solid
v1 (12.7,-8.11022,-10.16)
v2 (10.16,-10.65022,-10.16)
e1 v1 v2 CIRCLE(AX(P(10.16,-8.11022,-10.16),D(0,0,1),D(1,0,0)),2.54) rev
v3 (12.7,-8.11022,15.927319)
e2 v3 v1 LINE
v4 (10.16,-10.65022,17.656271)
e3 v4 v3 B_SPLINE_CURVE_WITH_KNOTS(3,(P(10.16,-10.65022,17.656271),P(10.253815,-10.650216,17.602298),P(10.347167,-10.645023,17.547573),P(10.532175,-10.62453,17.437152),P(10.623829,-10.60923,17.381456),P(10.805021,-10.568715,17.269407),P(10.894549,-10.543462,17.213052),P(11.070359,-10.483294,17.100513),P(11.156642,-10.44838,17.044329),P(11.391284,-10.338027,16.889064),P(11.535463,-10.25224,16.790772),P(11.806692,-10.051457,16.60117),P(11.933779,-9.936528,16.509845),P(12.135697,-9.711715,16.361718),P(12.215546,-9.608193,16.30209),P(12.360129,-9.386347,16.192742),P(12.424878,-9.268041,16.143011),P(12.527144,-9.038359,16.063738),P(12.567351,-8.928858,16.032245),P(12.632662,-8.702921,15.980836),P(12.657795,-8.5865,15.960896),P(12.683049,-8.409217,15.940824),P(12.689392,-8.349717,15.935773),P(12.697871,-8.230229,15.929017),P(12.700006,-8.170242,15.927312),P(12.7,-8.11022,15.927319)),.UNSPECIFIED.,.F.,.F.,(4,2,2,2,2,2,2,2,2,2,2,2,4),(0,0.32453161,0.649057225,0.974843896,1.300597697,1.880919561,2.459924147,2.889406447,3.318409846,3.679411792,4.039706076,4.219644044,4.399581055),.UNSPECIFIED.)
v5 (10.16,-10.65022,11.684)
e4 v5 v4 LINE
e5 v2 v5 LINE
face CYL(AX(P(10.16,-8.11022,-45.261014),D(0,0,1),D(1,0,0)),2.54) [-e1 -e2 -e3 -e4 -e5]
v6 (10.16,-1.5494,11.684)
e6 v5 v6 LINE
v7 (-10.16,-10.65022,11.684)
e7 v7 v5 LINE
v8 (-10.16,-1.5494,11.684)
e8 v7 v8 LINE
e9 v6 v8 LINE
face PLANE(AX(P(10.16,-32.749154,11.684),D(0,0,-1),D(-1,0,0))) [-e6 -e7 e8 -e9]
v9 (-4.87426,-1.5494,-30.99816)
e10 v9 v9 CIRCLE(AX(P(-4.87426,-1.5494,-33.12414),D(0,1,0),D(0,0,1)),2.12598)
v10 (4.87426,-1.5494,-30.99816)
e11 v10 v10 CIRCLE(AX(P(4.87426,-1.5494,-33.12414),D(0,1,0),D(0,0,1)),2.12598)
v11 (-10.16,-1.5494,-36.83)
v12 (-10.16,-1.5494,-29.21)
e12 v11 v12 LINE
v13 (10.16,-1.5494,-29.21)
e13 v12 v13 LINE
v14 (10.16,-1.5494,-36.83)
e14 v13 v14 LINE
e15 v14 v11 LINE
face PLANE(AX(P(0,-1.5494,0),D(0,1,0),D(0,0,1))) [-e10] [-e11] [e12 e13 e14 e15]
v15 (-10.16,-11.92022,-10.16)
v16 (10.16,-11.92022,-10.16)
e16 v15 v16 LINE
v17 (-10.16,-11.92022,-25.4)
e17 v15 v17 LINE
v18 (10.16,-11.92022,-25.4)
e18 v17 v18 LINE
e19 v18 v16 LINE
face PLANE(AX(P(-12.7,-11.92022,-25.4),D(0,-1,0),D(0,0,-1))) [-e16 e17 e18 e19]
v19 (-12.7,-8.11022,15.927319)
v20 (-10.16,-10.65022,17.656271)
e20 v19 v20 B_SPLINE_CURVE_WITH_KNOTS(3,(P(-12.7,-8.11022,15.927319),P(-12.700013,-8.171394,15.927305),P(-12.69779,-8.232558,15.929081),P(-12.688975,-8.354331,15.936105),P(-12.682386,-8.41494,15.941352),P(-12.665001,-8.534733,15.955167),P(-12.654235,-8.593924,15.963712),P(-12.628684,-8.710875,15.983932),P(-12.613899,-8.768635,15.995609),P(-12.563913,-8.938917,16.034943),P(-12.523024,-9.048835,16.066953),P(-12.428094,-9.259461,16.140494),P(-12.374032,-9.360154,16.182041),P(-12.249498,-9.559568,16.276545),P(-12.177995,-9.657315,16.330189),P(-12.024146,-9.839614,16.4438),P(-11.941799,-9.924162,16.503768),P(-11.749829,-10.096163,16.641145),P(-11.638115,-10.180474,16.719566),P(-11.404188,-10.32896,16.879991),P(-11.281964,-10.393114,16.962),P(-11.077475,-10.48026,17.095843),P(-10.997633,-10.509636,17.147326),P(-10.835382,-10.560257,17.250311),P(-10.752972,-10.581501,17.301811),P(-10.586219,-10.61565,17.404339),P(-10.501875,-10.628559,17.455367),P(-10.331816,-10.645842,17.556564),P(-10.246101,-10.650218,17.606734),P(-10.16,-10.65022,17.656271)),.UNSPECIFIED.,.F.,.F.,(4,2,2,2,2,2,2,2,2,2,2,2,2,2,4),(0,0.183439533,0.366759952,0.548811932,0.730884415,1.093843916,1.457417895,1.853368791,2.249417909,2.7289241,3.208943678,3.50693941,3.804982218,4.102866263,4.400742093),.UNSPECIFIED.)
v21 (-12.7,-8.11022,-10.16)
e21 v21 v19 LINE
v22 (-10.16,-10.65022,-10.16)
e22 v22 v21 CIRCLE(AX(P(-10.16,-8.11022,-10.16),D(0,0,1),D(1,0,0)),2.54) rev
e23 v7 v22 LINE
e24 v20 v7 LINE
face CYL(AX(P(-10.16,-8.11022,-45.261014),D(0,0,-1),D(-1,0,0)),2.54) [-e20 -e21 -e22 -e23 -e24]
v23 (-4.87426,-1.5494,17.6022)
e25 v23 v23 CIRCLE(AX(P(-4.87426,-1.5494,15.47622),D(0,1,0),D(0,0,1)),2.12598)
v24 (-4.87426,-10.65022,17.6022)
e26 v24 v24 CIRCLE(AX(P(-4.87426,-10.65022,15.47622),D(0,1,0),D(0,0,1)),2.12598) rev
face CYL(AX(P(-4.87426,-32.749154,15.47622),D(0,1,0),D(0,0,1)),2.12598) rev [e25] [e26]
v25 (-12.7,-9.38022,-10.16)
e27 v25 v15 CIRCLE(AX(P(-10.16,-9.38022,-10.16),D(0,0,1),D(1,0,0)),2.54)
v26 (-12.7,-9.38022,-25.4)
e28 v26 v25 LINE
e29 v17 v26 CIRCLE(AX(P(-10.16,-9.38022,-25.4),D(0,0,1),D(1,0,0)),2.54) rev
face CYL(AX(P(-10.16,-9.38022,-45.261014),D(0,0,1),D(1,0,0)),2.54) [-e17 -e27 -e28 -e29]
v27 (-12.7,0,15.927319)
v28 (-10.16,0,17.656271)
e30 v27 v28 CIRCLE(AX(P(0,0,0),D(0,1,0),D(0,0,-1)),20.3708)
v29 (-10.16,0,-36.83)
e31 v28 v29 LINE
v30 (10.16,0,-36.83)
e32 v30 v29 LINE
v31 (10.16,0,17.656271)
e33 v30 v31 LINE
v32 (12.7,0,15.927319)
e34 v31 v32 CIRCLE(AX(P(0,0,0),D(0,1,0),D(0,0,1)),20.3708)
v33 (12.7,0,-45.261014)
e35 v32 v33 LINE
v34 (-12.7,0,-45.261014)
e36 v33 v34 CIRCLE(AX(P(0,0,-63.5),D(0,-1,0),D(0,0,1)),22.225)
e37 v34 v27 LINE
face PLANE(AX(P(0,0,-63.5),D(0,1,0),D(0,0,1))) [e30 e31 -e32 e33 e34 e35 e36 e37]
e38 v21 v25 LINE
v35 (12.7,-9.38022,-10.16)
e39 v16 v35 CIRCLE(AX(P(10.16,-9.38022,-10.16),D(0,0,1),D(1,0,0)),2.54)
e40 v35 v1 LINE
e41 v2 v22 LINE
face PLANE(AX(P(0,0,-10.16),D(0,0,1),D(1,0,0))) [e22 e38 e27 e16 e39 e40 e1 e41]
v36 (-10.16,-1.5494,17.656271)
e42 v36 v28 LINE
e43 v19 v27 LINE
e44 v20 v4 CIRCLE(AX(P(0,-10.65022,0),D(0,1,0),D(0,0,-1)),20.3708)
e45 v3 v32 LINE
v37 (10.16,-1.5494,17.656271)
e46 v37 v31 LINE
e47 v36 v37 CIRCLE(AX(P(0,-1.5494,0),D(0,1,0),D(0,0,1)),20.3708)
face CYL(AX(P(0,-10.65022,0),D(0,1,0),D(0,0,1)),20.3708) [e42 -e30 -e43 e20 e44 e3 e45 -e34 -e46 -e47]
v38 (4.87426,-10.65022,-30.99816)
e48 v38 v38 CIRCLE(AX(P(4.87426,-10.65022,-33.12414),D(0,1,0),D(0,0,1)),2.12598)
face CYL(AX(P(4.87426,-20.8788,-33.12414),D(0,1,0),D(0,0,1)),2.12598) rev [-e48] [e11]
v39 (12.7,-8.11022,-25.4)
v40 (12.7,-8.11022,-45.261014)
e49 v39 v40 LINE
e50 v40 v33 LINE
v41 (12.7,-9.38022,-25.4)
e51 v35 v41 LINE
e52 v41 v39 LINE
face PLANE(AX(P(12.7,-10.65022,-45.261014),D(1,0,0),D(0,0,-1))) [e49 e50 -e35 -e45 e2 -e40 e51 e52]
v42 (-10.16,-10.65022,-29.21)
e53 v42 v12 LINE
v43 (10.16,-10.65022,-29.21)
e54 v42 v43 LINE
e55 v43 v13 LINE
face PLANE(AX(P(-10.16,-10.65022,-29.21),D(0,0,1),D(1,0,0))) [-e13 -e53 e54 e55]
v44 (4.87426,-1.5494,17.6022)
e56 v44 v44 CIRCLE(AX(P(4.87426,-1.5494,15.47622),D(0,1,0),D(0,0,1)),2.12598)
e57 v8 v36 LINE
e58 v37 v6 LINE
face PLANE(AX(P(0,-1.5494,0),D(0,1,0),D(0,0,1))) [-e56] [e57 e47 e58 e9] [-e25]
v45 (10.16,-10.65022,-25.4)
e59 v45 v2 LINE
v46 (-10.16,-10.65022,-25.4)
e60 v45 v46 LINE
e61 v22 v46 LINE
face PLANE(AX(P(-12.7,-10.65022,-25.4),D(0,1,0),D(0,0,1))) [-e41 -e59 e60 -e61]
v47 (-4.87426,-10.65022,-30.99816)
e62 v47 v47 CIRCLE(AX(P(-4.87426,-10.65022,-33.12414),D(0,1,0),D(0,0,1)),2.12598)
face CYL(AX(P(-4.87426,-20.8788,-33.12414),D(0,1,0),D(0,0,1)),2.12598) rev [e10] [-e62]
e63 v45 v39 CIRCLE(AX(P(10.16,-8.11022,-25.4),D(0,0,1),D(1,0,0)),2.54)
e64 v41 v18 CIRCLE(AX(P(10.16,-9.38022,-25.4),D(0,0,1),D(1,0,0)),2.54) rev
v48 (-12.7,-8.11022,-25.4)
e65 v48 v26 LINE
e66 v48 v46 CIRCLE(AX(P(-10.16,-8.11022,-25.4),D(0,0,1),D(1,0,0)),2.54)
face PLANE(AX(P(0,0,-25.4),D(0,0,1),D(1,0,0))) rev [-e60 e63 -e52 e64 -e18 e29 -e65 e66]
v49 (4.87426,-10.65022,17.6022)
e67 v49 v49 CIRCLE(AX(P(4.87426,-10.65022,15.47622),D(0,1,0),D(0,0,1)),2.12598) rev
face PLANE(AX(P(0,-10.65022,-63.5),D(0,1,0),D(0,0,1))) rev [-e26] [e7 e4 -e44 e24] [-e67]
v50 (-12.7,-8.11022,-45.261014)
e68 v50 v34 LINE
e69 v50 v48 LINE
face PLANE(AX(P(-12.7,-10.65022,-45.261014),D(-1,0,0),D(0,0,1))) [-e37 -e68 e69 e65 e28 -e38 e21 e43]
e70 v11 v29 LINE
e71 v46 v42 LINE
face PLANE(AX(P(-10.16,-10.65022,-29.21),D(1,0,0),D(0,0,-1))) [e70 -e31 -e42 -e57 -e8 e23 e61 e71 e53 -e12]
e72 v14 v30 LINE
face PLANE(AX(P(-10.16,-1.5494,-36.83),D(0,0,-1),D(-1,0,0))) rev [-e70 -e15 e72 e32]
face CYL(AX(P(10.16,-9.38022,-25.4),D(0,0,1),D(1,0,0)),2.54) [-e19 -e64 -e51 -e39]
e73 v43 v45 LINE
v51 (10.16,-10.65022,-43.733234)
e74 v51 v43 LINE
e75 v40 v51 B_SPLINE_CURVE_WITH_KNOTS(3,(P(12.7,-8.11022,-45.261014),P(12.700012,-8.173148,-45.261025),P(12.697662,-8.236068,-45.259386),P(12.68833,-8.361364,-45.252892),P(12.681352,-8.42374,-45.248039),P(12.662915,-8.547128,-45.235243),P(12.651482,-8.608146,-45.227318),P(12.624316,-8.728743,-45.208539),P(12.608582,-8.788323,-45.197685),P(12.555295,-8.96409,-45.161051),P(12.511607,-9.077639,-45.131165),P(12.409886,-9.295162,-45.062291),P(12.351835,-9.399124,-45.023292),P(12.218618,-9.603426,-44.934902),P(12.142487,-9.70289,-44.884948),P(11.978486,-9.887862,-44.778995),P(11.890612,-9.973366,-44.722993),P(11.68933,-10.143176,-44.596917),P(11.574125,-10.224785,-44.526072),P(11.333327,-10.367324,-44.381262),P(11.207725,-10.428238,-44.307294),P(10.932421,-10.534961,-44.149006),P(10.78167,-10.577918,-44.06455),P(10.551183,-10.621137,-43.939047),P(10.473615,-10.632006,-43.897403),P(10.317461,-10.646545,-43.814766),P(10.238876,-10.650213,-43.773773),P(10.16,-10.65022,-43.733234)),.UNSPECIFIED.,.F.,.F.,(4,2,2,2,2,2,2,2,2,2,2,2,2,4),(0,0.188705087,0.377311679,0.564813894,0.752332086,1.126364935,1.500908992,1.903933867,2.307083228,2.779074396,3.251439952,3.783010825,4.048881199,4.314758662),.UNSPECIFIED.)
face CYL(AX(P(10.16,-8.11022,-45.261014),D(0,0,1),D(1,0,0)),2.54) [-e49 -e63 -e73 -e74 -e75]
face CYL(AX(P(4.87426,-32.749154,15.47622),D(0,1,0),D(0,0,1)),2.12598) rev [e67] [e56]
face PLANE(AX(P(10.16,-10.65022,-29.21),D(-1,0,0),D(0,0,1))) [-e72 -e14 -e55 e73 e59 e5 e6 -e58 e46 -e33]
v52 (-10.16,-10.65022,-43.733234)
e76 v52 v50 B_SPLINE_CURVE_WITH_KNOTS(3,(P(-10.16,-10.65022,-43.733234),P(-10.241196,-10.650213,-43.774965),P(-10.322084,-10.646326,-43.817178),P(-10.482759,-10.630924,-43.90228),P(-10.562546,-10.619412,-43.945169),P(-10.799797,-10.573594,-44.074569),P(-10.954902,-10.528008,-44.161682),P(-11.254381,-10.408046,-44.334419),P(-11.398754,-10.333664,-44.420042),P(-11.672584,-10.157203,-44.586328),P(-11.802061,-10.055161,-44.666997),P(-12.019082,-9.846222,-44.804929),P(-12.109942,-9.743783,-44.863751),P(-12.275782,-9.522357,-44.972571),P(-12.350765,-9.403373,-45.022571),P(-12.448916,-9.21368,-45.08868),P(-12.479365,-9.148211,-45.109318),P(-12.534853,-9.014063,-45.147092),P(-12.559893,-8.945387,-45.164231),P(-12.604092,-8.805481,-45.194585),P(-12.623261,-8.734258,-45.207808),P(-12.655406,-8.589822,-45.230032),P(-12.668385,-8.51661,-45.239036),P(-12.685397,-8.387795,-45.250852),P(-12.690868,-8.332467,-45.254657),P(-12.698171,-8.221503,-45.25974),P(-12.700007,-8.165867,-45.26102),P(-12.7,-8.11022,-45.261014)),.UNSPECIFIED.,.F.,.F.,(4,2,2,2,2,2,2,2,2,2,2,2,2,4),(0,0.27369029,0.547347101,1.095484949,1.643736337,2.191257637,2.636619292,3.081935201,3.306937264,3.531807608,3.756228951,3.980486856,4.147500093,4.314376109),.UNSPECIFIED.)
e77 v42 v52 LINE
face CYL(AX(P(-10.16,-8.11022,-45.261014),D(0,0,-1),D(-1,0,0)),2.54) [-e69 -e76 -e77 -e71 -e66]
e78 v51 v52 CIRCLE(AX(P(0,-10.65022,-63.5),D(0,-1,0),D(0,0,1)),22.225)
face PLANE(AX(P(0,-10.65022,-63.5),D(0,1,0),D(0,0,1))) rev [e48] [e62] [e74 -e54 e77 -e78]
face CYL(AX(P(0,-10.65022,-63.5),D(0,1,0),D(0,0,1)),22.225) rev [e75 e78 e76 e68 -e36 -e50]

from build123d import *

# Parameters (mm, degrees)
BOSS_EXTRUDE1_DEPTH = 10.65022
SKETCH3_W           = 20.32
SKETCH3_H           = 7.62
CUT_EXTRUDE1_DEPTH  = 1.5494
SKETCH4_R           = 2.12598
CUT_EXTRUDE2_DEPTH  = 19.3294
SKETCH5_R           = 2.12598
BOSS_EXTRUDE2_DEPTH = 9.10082
SKETCH6_W           = 25.4
SKETCH6_H           = 1.27
BOSS_EXTRUDE3_DEPTH = 15.24
FILLET1_R           = 2.54
FILLET2_R           = 2.54


with BuildPart() as part:
    # Sketch2 → Boss-Extrude1 (new body)
    with BuildSketch(Plane(origin=(0, 0, 0), x_dir=(1, 0, 0), z_dir=(0, 1, 0))):
        with BuildLine():
            Line((-12.7, 45.261013597), (-12.7, -15.927319066))
            ThreePointArc((-12.7, -15.927319066), (-11.462644476, -16.839752797), (-10.16, -17.656270632))
            Line((-10.16, -17.656270632), (-10.16, 29.21))
            Line((-10.16, 29.21), (10.16, 29.21))
            Line((10.16, 29.21), (10.16, -17.656270632))
            ThreePointArc((10.16, -17.656270632), (11.462644476, -16.839752797), (12.7, -15.927319066))
            Line((12.7, -15.927319066), (12.7, 45.261013597))
            ThreePointArc((12.7, 45.261013597), (0, 41.275), (-12.7, 45.261013597))
        make_face()
    extrude(amount=-BOSS_EXTRUDE1_DEPTH)

    # Sketch3 → Cut-Extrude1 (cut)
    with BuildSketch(Plane(origin=(0, 0, 0), x_dir=(1, 0, 0), z_dir=(0, 1, 0))):
        with Locations((0, 33.02)):
            Rectangle(SKETCH3_W, SKETCH3_H)
    extrude(amount=-CUT_EXTRUDE1_DEPTH, mode=Mode.SUBTRACT)

    # Sketch4 → Cut-Extrude2 (cut)
    with BuildSketch(Plane(origin=(0, -1.5494, 0), x_dir=(1, 0, 0), z_dir=(0, 1, 0))):
        with Locations(Location((-4.87426, 33.12414, 0), (0, 0, 270))):
            Circle(SKETCH4_R)
        with Locations(Location((4.87426, 33.12414, 0), (0, 0, 270))):
            Circle(SKETCH4_R)
    extrude(amount=-CUT_EXTRUDE2_DEPTH, mode=Mode.SUBTRACT)

    # Sketch5 → Boss-Extrude2 (add)
    with BuildSketch(Plane(origin=(0, -1.5494, 0), x_dir=(1, 0, 0), z_dir=(0, 1, 0))):
        with BuildLine():
            Line((10.16, -11.684), (-10.16, -11.684))
            Line((-10.16, -11.684), (-10.16, -17.656270632))
            ThreePointArc((-10.16, -17.656270632), (0, -20.3708), (10.16, -17.656270632))
            Line((10.16, -17.656270632), (10.16, -11.684))
        make_face()
        with Locations(Location((4.87426, -15.47622, 0), (0, 0, 270))):
            Circle(SKETCH5_R, mode=Mode.SUBTRACT)
        with Locations(Location((-4.87426, -15.47622, 0), (0, 0, 270))):
            Circle(SKETCH5_R, mode=Mode.SUBTRACT)
    extrude(amount=-BOSS_EXTRUDE2_DEPTH)

    # Sketch6 → Boss-Extrude3 (add)
    with BuildSketch(Plane.XY.offset(-10.16)):
        with Locations((0, -11.28522)):
            Rectangle(SKETCH6_W, SKETCH6_H)
    extrude(amount=-BOSS_EXTRUDE3_DEPTH)

    # Fillet1
    fillet1_edges = [part.edges().sort_by_distance(p)[0] for p in [
        (12.7, -10.65022, 2.883659533),
        (-12.7, -10.65022, 2.883659533),
        (-12.7, -10.65022, -35.330506799),
        (12.7, -10.65022, -35.330506799),
    ]]
    fillet(fillet1_edges, radius=FILLET1_R - 0.0001)  # a hair under: the kernel refuses the full size

    # Fillet2
    fillet2_edges = [part.edges().sort_by_distance(p)[0] for p in [
        (-12.7, -11.92022, -17.78),
        (12.7, -11.92022, -17.78),
    ]]
    fillet(fillet2_edges, radius=FILLET2_R)


solid = part.part
